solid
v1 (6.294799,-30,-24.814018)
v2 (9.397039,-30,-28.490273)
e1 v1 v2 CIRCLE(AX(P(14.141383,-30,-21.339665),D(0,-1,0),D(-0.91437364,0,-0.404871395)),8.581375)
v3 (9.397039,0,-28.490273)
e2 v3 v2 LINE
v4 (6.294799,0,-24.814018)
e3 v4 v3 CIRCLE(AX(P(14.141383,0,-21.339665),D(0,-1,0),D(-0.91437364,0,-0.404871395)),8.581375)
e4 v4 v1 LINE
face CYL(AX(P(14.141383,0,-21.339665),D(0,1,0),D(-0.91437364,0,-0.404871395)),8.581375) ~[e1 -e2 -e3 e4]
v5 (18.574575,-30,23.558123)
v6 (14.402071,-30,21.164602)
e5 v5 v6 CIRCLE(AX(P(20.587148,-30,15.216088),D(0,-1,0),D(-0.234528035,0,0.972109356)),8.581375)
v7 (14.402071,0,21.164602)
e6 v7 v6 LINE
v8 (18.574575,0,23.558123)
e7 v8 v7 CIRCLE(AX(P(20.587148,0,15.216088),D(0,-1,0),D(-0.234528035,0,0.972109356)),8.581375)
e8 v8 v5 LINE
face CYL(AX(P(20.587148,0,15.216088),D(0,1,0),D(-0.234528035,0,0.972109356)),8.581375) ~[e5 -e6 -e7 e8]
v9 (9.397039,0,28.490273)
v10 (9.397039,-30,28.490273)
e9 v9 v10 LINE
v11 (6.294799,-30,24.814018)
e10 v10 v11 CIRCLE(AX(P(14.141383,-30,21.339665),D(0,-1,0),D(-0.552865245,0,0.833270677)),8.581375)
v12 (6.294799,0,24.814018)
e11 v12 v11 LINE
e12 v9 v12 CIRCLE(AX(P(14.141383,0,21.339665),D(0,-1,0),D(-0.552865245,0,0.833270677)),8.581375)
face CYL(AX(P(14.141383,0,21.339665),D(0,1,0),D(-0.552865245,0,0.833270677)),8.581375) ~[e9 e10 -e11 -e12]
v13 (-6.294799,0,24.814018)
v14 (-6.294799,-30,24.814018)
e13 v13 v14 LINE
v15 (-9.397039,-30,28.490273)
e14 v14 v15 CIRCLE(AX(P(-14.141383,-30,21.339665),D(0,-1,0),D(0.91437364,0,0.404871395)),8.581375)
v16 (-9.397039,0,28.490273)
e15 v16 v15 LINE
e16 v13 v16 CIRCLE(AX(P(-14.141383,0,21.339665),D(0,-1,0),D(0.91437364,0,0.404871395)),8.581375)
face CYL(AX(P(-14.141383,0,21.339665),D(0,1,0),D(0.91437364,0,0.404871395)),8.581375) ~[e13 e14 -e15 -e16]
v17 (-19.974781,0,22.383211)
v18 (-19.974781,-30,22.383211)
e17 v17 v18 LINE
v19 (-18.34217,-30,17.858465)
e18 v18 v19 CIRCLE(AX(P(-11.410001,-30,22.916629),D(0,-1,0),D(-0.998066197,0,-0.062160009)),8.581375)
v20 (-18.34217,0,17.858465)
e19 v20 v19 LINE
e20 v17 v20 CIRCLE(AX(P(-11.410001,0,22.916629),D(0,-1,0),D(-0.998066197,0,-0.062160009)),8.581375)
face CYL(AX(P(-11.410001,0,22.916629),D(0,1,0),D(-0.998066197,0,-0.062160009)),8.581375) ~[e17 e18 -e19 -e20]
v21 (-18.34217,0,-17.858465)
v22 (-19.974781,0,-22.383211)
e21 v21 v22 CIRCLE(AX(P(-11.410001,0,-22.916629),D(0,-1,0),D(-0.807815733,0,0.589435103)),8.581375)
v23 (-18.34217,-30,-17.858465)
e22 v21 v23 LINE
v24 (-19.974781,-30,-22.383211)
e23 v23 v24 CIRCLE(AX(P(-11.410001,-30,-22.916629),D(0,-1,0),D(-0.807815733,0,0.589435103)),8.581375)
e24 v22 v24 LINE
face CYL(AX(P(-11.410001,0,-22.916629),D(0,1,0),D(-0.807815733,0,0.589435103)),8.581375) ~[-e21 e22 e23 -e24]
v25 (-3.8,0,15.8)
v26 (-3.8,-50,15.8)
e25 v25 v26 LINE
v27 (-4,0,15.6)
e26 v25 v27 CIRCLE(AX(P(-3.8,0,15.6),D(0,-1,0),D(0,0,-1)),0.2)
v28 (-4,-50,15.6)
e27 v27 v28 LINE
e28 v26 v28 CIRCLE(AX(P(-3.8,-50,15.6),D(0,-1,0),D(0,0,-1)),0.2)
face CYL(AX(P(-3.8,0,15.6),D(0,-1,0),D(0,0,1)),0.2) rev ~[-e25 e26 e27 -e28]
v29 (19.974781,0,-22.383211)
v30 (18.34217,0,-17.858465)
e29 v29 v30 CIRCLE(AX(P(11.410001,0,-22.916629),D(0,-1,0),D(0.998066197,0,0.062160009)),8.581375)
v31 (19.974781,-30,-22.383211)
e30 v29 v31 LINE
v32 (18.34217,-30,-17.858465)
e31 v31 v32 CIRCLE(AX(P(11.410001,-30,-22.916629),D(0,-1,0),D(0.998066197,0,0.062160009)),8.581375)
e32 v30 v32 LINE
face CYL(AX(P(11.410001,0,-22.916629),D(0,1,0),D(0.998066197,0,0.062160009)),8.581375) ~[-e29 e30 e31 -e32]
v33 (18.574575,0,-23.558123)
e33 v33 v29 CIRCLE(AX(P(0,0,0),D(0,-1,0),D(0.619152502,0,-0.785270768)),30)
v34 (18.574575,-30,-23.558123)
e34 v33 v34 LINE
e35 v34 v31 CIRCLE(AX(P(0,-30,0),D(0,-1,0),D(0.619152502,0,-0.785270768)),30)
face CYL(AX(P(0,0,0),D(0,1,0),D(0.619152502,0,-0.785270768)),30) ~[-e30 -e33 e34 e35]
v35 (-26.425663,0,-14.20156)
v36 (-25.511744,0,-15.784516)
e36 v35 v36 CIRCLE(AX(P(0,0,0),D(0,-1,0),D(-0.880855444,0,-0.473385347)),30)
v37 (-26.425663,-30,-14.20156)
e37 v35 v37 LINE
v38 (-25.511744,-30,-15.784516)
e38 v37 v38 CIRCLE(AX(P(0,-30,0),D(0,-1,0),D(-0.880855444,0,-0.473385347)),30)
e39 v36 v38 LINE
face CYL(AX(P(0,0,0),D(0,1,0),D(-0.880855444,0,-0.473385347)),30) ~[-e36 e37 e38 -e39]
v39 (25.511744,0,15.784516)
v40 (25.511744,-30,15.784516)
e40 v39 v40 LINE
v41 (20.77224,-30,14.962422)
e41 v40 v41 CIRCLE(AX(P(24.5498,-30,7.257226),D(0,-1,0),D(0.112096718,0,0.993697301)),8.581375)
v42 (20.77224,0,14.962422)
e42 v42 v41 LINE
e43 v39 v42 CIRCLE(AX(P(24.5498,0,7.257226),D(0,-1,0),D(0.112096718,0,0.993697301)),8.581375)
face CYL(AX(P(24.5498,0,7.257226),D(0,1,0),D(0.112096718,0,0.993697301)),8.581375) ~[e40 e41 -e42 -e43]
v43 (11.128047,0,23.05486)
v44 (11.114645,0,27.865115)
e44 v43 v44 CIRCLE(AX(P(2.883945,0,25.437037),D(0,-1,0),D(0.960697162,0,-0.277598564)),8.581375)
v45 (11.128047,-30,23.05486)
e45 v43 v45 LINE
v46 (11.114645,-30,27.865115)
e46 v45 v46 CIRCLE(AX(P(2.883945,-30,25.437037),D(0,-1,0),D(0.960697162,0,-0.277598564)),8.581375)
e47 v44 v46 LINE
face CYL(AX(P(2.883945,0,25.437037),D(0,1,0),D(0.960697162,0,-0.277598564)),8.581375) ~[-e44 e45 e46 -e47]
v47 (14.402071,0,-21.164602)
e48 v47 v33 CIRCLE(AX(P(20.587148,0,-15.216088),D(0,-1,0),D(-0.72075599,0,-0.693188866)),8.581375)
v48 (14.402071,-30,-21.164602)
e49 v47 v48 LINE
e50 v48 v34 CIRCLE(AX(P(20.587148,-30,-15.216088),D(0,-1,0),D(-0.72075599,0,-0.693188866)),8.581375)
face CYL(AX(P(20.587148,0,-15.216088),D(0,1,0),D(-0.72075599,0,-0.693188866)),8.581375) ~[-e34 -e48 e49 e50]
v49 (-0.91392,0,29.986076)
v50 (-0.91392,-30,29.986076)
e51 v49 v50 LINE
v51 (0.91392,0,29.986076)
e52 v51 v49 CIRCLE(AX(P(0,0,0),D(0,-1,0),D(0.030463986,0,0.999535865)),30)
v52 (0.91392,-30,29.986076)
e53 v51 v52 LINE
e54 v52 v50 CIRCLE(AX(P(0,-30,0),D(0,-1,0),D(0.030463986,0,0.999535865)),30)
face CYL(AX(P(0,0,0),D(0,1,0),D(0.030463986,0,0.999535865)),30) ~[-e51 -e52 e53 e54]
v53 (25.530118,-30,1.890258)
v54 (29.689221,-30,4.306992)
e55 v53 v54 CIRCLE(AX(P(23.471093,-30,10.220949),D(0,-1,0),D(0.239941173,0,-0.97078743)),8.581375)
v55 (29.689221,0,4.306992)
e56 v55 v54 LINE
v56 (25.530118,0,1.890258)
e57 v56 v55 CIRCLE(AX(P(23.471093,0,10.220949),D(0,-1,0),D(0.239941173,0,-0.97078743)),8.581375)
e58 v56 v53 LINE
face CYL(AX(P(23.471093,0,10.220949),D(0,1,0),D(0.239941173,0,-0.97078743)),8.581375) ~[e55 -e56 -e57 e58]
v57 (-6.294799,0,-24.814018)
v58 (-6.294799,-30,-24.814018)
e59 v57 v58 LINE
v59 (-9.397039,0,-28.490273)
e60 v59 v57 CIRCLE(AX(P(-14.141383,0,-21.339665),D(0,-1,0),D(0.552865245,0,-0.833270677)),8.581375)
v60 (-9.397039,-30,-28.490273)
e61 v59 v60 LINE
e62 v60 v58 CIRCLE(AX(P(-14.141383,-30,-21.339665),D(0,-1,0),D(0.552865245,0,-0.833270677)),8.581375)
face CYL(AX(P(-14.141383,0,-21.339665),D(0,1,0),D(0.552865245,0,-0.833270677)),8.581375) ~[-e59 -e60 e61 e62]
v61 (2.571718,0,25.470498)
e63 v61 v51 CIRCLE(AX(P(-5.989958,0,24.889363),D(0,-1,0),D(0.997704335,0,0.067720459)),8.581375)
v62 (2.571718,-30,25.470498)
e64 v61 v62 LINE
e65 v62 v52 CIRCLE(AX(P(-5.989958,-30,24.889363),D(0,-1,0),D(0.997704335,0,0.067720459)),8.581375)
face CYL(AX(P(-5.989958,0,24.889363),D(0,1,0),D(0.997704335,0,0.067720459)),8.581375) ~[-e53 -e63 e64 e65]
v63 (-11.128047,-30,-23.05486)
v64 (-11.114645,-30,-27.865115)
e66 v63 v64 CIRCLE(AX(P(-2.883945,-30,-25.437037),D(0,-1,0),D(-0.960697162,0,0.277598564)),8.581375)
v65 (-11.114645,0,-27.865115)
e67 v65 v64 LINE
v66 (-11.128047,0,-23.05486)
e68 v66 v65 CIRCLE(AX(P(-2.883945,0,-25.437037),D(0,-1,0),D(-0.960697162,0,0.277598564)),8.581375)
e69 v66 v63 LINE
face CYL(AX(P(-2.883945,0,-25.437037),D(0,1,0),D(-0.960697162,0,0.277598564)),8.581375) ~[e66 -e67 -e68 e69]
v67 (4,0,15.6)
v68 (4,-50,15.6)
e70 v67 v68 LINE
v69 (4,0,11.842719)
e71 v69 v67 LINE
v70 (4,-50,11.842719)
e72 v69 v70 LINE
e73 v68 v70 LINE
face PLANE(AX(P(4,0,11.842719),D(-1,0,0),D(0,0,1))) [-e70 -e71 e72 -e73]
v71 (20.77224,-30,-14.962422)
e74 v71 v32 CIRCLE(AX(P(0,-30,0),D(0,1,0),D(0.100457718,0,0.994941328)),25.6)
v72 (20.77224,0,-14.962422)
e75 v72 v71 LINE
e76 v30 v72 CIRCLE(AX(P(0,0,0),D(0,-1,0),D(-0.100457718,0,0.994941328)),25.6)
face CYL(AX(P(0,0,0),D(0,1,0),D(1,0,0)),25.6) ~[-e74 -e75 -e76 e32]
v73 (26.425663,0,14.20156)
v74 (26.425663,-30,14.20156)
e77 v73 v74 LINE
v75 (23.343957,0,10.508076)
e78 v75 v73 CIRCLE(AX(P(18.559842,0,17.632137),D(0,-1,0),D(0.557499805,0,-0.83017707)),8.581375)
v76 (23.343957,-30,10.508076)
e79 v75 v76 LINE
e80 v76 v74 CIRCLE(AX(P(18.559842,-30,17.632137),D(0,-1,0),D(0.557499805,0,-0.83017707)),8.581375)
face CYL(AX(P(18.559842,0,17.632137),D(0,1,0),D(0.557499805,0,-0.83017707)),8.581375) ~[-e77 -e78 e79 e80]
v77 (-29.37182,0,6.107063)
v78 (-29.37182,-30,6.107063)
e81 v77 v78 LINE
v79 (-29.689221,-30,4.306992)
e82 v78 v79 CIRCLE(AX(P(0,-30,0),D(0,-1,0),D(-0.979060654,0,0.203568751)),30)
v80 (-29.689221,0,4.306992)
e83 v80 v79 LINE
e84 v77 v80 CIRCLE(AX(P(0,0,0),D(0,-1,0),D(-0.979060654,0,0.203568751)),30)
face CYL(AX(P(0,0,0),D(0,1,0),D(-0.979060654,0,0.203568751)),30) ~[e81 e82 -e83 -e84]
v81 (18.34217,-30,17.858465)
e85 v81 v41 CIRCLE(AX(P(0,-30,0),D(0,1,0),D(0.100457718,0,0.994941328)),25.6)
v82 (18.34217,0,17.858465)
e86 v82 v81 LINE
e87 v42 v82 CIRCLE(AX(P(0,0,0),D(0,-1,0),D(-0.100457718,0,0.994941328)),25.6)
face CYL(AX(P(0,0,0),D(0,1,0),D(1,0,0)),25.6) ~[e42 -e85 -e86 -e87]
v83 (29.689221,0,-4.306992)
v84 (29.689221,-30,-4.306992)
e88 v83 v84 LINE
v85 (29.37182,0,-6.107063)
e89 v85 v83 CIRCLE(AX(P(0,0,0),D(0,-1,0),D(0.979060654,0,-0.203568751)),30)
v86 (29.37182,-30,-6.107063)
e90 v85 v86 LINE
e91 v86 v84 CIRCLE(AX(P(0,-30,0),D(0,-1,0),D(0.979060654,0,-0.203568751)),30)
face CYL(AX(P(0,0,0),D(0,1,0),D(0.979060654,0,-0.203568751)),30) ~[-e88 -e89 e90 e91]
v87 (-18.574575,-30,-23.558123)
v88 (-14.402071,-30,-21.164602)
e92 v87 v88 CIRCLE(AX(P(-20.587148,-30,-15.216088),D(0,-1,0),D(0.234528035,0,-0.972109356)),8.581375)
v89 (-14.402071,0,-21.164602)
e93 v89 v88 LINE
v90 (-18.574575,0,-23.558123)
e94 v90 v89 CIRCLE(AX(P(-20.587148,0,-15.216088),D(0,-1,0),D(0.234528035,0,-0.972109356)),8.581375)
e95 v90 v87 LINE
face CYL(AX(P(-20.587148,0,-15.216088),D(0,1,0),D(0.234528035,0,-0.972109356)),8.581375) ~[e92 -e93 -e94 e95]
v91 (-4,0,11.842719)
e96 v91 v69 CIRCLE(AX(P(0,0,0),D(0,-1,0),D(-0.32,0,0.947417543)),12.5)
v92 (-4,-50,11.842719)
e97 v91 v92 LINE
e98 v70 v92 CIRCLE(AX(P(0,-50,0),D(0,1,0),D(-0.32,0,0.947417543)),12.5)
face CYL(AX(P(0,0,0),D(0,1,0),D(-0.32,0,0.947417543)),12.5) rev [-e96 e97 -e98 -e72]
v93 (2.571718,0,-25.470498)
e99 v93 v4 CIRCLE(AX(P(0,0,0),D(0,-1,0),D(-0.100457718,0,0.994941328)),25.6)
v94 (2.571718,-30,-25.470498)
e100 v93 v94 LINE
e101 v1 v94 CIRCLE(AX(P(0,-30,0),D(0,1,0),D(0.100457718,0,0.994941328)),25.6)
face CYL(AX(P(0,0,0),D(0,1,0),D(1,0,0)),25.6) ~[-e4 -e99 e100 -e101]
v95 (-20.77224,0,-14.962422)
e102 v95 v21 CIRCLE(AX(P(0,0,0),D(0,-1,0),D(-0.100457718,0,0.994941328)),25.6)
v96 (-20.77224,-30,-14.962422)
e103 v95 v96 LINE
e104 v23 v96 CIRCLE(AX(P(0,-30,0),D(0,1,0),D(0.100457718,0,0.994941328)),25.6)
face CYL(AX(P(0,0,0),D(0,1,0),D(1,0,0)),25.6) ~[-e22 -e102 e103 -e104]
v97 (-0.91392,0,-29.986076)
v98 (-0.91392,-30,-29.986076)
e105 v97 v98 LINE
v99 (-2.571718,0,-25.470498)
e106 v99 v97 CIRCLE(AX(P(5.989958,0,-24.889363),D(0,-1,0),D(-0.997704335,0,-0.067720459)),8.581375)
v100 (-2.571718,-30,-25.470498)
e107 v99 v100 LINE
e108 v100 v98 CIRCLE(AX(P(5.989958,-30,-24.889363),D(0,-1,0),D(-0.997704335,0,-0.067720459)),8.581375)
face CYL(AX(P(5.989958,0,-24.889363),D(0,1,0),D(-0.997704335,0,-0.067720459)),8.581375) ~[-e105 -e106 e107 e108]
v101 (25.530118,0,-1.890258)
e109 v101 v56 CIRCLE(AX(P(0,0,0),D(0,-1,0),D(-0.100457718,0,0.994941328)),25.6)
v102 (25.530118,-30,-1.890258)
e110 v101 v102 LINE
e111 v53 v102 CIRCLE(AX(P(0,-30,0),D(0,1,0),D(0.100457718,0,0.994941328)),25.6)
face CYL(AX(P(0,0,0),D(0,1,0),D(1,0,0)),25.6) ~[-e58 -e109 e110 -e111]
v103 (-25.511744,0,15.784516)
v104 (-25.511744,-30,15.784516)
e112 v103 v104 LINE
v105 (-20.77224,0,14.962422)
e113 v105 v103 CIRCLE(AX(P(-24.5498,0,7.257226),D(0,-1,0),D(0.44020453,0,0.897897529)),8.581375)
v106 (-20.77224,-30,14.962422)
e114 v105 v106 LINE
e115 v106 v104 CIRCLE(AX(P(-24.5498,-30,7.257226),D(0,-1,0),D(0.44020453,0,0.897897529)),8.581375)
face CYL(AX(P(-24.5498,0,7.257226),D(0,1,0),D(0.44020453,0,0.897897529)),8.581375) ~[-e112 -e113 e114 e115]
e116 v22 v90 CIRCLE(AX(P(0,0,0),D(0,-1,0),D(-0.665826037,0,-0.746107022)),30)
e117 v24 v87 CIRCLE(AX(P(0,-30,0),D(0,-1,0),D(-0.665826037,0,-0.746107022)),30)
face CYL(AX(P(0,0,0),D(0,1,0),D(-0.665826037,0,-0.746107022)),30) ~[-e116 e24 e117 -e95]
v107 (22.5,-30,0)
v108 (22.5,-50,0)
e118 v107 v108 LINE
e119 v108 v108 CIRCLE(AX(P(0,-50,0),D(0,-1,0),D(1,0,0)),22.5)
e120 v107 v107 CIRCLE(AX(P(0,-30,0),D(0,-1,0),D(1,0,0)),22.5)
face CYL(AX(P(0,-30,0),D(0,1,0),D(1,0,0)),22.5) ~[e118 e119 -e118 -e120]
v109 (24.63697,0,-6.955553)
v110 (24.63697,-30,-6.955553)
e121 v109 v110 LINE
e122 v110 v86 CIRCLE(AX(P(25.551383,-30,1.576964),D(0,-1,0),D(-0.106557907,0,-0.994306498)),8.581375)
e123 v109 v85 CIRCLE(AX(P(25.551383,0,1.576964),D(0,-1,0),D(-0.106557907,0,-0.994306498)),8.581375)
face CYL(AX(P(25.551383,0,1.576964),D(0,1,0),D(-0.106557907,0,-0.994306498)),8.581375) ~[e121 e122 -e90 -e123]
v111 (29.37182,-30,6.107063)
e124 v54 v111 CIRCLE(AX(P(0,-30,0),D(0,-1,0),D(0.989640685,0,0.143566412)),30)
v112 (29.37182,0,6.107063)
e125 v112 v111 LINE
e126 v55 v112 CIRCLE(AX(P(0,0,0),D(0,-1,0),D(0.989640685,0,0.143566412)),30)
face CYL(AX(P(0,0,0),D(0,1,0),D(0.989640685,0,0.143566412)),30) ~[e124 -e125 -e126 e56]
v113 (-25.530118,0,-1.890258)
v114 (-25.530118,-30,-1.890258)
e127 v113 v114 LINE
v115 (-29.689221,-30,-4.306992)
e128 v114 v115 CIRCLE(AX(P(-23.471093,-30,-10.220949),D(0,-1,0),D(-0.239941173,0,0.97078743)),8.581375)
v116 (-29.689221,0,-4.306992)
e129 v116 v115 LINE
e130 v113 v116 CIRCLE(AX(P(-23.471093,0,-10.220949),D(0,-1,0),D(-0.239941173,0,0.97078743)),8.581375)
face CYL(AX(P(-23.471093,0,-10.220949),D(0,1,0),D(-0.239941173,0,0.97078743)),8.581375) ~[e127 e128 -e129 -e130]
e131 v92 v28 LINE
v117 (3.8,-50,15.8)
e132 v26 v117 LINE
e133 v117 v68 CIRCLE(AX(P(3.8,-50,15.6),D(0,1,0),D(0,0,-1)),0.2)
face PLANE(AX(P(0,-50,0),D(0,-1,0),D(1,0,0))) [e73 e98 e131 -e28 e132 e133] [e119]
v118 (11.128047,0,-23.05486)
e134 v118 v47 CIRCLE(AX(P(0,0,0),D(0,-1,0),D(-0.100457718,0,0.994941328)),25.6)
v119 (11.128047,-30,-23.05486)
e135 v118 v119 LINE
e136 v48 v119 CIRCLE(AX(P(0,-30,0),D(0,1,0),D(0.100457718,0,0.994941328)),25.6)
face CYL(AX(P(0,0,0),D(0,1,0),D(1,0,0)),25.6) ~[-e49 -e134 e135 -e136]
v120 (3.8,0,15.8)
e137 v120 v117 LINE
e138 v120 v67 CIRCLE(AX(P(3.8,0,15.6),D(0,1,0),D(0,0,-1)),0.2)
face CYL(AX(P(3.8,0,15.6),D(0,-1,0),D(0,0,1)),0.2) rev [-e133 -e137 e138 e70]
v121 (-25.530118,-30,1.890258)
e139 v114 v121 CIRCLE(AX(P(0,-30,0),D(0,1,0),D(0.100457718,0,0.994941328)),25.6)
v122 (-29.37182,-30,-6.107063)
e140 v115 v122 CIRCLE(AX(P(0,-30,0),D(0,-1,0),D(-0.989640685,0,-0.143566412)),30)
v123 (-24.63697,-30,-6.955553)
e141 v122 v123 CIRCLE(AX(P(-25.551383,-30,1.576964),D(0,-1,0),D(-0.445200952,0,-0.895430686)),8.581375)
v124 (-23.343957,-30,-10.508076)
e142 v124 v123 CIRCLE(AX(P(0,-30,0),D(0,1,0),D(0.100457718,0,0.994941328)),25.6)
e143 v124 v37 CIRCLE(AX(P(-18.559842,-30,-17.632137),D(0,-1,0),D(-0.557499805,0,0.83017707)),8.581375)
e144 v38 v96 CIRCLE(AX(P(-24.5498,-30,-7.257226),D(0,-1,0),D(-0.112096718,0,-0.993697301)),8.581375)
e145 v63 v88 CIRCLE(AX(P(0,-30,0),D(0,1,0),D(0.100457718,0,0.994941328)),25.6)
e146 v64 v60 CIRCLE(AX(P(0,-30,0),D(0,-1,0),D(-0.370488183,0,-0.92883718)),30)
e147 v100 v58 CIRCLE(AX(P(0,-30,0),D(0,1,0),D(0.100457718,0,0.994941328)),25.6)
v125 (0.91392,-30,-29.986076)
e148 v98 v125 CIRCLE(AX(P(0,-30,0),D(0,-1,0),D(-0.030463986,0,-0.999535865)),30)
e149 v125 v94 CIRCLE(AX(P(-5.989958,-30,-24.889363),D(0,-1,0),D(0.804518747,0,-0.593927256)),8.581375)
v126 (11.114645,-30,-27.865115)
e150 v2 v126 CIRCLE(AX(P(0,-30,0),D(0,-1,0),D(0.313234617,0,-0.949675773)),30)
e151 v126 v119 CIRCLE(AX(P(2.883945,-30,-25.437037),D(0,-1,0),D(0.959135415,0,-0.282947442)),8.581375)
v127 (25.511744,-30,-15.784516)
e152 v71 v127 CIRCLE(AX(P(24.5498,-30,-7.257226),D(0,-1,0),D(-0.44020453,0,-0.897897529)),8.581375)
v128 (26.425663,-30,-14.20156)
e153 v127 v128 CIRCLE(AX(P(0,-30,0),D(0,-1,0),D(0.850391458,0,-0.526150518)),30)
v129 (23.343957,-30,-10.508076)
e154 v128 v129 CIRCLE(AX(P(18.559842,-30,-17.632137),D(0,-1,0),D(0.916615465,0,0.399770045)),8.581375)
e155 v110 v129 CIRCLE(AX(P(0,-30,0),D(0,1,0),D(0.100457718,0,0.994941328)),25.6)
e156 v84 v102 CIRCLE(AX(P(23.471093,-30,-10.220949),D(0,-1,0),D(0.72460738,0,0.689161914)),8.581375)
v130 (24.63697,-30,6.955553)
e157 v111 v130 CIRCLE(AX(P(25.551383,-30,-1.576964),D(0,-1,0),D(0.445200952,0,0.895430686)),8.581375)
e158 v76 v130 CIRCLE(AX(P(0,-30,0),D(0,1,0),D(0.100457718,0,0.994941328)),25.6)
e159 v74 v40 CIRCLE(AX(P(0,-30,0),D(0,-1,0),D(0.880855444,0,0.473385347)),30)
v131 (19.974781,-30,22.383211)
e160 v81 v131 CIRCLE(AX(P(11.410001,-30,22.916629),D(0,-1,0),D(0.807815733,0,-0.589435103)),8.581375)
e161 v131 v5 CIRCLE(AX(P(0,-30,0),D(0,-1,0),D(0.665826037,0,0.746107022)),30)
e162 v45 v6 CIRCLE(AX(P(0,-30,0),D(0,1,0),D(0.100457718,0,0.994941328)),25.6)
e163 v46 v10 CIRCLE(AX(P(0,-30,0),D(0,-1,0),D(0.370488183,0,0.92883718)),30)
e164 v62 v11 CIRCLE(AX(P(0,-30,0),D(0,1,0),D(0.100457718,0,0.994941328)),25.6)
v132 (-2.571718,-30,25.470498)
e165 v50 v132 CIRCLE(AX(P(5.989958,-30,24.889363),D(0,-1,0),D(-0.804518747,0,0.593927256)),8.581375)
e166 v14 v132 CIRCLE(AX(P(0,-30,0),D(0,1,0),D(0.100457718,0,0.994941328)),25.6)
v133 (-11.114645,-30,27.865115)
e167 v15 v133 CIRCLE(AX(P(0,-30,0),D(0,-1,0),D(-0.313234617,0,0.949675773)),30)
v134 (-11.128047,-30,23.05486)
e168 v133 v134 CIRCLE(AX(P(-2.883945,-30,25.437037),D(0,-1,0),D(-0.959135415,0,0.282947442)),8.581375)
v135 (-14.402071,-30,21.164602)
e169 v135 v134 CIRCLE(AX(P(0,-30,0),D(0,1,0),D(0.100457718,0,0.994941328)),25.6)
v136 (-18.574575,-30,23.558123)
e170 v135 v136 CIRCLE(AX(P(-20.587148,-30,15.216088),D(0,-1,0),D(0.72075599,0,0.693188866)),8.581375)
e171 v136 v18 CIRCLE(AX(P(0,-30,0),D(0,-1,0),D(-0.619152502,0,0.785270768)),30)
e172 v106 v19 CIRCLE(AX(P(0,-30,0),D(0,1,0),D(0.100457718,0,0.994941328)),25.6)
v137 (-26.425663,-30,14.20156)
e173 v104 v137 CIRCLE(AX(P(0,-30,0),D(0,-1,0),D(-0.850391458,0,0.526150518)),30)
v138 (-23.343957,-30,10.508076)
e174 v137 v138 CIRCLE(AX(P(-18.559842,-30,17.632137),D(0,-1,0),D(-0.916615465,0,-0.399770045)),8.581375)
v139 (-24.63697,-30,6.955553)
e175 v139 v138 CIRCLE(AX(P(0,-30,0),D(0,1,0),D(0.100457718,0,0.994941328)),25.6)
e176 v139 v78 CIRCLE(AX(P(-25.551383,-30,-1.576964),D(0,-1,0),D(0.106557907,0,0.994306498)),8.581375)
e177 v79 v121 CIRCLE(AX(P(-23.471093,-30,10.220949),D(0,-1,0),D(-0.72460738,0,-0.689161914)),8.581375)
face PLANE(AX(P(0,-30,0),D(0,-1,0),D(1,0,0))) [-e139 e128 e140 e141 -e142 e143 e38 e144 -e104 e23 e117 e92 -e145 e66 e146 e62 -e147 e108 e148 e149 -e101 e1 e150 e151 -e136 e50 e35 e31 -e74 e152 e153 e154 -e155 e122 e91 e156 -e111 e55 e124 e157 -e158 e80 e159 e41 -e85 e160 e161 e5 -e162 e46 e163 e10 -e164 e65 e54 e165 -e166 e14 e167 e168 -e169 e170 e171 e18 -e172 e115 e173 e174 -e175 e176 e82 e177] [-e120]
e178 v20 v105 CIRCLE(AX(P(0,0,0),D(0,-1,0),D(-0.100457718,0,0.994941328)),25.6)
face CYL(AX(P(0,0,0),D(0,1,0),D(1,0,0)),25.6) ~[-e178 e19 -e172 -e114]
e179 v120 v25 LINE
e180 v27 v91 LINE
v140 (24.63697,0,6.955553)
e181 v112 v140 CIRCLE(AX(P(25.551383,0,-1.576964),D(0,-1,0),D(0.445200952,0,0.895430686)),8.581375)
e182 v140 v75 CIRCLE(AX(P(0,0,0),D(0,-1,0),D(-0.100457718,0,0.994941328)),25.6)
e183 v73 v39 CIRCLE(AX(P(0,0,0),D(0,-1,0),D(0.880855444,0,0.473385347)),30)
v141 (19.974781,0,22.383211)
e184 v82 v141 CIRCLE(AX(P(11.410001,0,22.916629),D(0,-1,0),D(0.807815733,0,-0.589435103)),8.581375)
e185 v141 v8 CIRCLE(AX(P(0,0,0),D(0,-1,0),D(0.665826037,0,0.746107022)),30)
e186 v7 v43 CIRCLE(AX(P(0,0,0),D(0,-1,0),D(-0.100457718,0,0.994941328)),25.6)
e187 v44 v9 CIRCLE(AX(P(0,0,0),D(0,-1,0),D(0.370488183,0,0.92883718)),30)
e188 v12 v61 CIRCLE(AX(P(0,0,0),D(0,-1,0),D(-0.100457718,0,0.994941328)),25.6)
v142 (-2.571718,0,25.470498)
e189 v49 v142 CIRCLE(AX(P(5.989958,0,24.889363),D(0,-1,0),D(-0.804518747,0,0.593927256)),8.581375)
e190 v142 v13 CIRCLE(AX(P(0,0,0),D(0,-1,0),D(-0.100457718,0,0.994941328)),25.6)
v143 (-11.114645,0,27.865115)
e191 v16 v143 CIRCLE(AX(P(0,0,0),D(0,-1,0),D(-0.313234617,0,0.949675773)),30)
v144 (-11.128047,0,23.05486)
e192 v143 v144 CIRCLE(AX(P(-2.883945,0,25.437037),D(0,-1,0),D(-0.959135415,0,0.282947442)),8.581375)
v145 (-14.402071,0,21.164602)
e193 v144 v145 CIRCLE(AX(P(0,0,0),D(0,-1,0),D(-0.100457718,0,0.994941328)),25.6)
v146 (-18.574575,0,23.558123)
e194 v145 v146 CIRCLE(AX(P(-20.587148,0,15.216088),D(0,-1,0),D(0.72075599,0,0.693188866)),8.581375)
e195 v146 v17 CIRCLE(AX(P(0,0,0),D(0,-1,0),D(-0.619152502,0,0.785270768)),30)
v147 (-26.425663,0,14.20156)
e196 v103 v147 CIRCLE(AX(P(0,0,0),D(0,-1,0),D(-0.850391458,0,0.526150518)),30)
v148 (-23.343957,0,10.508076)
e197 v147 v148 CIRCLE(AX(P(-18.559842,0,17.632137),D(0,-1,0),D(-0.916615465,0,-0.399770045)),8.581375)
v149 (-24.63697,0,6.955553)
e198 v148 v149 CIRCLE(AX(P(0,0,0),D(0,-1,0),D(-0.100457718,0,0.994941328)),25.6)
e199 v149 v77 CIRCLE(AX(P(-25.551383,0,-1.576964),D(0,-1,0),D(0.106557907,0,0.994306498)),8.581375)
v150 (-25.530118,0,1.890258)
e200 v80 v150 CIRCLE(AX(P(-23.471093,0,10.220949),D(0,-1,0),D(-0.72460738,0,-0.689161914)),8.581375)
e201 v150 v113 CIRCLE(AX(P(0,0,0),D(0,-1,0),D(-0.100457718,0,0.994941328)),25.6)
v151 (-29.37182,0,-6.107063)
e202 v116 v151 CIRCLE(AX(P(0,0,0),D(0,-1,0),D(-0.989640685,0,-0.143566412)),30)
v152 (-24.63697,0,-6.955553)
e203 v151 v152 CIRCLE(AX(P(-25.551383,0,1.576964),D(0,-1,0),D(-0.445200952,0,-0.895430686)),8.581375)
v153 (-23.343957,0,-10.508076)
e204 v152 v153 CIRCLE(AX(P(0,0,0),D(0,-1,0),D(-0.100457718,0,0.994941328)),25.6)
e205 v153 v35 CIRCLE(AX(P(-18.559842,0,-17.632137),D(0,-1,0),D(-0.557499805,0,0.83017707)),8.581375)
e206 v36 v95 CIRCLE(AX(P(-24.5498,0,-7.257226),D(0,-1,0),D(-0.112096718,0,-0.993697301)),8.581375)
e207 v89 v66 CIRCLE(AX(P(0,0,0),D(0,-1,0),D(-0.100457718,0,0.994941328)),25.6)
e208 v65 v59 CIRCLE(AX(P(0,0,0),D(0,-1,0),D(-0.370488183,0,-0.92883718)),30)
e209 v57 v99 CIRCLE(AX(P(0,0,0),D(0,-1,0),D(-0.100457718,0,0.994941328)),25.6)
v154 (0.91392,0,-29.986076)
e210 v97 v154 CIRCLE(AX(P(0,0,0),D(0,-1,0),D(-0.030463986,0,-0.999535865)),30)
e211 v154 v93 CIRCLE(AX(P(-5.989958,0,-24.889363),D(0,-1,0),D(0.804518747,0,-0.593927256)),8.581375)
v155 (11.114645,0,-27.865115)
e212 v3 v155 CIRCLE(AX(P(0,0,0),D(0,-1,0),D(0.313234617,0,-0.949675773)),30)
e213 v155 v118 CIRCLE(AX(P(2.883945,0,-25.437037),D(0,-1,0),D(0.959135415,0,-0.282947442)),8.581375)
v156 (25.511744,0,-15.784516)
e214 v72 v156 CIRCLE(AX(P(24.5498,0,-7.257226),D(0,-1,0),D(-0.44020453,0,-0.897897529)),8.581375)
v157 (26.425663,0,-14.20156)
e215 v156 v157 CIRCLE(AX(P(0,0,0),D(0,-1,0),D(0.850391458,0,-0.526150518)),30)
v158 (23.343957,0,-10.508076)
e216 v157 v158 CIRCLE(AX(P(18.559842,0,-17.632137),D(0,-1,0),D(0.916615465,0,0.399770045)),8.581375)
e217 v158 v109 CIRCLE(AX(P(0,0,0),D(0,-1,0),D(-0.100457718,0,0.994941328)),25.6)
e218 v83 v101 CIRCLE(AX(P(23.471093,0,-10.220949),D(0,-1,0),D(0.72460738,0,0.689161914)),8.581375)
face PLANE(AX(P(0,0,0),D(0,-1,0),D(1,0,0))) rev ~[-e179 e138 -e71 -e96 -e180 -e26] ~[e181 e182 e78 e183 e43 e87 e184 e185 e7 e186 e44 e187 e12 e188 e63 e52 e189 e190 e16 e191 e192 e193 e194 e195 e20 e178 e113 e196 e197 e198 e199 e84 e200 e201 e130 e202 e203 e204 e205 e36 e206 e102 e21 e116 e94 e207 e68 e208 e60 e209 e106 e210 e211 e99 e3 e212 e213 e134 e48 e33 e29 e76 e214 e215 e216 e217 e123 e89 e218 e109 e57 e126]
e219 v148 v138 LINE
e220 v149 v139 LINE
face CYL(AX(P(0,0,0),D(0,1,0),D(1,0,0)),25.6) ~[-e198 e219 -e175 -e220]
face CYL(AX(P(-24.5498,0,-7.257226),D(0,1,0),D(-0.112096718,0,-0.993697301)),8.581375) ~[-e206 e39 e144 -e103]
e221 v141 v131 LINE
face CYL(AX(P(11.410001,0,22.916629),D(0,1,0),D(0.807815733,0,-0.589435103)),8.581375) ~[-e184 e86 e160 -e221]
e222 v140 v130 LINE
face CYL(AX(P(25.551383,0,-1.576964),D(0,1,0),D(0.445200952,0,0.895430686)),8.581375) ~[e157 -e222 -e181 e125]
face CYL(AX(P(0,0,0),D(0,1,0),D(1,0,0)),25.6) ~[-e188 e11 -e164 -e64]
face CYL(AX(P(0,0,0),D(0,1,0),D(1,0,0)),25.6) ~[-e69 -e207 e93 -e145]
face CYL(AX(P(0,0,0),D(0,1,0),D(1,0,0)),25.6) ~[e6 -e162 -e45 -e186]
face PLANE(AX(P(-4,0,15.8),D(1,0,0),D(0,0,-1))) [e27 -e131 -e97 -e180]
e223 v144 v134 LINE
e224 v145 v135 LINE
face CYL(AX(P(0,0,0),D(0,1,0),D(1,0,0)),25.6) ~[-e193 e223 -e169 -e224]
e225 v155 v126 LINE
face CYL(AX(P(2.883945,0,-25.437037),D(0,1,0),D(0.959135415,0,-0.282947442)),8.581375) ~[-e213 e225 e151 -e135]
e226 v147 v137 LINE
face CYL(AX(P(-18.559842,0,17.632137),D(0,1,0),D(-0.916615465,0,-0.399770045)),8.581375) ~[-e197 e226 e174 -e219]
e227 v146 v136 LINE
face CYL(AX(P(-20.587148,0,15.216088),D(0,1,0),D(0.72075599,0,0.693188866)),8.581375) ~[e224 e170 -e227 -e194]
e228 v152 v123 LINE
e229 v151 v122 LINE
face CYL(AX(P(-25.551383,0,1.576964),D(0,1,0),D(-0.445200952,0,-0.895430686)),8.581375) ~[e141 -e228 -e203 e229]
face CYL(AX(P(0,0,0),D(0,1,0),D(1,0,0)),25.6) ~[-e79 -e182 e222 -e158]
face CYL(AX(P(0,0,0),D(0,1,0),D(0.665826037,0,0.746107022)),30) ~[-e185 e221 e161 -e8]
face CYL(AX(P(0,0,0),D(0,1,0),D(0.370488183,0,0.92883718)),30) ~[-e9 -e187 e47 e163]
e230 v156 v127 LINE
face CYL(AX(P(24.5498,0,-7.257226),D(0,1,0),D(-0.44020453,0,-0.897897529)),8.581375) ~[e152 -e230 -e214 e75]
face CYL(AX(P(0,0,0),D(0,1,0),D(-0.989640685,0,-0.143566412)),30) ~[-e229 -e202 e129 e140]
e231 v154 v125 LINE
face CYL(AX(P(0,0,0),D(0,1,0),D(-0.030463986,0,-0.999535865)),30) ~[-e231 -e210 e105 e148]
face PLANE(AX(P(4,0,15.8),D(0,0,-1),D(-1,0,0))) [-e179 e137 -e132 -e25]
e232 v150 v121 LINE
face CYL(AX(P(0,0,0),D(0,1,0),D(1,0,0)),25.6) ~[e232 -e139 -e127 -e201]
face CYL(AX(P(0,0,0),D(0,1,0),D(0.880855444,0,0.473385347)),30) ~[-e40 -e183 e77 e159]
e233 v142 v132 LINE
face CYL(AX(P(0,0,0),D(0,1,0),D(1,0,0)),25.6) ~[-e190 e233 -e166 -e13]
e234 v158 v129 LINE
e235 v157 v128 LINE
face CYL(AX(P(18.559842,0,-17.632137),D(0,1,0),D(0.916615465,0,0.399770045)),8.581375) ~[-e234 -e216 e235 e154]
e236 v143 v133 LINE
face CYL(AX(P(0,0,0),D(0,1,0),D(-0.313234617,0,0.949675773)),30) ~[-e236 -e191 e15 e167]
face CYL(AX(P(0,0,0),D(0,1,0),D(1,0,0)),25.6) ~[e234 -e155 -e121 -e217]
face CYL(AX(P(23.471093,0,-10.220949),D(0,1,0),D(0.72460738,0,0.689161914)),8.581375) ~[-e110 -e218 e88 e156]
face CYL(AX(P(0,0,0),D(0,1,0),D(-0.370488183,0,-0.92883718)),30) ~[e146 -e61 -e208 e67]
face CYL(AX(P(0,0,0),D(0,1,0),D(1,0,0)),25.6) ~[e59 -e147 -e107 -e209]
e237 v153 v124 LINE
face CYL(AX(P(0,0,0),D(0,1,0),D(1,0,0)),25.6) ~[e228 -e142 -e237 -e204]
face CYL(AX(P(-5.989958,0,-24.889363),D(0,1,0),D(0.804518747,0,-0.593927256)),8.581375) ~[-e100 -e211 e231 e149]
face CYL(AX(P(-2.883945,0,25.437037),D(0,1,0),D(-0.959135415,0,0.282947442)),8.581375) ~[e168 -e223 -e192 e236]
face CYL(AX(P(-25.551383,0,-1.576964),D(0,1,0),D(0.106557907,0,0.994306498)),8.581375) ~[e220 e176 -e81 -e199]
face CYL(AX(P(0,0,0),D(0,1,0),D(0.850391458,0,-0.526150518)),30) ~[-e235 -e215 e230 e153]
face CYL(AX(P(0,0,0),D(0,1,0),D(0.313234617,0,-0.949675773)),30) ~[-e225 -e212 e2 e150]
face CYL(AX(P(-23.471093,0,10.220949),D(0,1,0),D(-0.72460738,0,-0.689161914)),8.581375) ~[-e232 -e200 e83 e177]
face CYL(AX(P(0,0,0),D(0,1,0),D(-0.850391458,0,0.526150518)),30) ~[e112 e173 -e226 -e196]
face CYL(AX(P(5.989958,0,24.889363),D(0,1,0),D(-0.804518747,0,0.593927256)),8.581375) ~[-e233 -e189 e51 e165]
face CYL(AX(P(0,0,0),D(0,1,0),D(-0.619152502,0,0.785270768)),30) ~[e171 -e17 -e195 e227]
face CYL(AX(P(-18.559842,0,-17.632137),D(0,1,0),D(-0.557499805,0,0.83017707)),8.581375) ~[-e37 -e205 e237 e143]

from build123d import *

# Parameters (mm, degrees)
F0_R     = 25.6
F1_DEPTH = 30
F3_DEPTH = 30
F4_COUNT = 18
F5_R     = 22.5
F6_DEPTH = 20
F8_DEPTH = 50.001
F9_R     = 0.2


with BuildPart() as f1:
    # F0 (on Front) → F1 (new body)
    with BuildSketch(Plane.XZ):
        Circle(F0_R)
    extrude(amount=F1_DEPTH)

    # F2 (on Front) → F3 (join, through all)
    with BuildSketch(Plane.XZ):
        with BuildLine():
            ThreePointArc((-2.5717175805, 25.4704980062), (0, 25.6), (2.5717175805, 25.4704980062))
            ThreePointArc((2.5717175805, 25.4704980062), (2.0656887709, 27.8468218747), (0.9139195769, 29.9860759521))
            ThreePointArc((0.9139195769, 29.9860759521), (0, 30), (-0.9139195769, 29.9860759521))
            ThreePointArc((-0.9139195769, 29.9860759521), (-2.0656887709, 27.8468218747), (-2.5717175805, 25.4704980062))
        make_face()
    extrude(amount=F3_DEPTH)

    # F4: F1 ×18 about axis
    f4_axis = Axis((0, 0, 0), (0, 1, 0))


with BuildPart() as f1_1:
    add(f1.part)
    for i in range(1, F4_COUNT):
        add(f1.part.rotate(f4_axis, i * 360 / F4_COUNT))

    # F5 (on face) → F6 (join)
    with BuildSketch(Plane.XZ.offset(30)):
        Circle(F5_R)
    extrude(amount=F6_DEPTH)

    # F7 (on Front) → F8 (cut, through all)
    with BuildSketch(Plane.XZ):
        with BuildLine():
            Line((4, 15.8), (-4, 15.8))
            Line((-4, 15.8), (-4, 11.8427192823))
            ThreePointArc((-4, 11.8427192823), (0, -12.5), (4, 11.8427192823))
            Line((4, 11.8427192823), (4, 15.8))
        make_face()
    extrude(amount=F8_DEPTH, mode=Mode.SUBTRACT)

    # F9
    f9_edges = [f1_1.edges().sort_by_distance(p)[0] for p in [
        (-4, -25, 15.8),
        (4, -25, 15.8),
    ]]
    fillet(f9_edges, radius=F9_R)


solid = f1_1.part
